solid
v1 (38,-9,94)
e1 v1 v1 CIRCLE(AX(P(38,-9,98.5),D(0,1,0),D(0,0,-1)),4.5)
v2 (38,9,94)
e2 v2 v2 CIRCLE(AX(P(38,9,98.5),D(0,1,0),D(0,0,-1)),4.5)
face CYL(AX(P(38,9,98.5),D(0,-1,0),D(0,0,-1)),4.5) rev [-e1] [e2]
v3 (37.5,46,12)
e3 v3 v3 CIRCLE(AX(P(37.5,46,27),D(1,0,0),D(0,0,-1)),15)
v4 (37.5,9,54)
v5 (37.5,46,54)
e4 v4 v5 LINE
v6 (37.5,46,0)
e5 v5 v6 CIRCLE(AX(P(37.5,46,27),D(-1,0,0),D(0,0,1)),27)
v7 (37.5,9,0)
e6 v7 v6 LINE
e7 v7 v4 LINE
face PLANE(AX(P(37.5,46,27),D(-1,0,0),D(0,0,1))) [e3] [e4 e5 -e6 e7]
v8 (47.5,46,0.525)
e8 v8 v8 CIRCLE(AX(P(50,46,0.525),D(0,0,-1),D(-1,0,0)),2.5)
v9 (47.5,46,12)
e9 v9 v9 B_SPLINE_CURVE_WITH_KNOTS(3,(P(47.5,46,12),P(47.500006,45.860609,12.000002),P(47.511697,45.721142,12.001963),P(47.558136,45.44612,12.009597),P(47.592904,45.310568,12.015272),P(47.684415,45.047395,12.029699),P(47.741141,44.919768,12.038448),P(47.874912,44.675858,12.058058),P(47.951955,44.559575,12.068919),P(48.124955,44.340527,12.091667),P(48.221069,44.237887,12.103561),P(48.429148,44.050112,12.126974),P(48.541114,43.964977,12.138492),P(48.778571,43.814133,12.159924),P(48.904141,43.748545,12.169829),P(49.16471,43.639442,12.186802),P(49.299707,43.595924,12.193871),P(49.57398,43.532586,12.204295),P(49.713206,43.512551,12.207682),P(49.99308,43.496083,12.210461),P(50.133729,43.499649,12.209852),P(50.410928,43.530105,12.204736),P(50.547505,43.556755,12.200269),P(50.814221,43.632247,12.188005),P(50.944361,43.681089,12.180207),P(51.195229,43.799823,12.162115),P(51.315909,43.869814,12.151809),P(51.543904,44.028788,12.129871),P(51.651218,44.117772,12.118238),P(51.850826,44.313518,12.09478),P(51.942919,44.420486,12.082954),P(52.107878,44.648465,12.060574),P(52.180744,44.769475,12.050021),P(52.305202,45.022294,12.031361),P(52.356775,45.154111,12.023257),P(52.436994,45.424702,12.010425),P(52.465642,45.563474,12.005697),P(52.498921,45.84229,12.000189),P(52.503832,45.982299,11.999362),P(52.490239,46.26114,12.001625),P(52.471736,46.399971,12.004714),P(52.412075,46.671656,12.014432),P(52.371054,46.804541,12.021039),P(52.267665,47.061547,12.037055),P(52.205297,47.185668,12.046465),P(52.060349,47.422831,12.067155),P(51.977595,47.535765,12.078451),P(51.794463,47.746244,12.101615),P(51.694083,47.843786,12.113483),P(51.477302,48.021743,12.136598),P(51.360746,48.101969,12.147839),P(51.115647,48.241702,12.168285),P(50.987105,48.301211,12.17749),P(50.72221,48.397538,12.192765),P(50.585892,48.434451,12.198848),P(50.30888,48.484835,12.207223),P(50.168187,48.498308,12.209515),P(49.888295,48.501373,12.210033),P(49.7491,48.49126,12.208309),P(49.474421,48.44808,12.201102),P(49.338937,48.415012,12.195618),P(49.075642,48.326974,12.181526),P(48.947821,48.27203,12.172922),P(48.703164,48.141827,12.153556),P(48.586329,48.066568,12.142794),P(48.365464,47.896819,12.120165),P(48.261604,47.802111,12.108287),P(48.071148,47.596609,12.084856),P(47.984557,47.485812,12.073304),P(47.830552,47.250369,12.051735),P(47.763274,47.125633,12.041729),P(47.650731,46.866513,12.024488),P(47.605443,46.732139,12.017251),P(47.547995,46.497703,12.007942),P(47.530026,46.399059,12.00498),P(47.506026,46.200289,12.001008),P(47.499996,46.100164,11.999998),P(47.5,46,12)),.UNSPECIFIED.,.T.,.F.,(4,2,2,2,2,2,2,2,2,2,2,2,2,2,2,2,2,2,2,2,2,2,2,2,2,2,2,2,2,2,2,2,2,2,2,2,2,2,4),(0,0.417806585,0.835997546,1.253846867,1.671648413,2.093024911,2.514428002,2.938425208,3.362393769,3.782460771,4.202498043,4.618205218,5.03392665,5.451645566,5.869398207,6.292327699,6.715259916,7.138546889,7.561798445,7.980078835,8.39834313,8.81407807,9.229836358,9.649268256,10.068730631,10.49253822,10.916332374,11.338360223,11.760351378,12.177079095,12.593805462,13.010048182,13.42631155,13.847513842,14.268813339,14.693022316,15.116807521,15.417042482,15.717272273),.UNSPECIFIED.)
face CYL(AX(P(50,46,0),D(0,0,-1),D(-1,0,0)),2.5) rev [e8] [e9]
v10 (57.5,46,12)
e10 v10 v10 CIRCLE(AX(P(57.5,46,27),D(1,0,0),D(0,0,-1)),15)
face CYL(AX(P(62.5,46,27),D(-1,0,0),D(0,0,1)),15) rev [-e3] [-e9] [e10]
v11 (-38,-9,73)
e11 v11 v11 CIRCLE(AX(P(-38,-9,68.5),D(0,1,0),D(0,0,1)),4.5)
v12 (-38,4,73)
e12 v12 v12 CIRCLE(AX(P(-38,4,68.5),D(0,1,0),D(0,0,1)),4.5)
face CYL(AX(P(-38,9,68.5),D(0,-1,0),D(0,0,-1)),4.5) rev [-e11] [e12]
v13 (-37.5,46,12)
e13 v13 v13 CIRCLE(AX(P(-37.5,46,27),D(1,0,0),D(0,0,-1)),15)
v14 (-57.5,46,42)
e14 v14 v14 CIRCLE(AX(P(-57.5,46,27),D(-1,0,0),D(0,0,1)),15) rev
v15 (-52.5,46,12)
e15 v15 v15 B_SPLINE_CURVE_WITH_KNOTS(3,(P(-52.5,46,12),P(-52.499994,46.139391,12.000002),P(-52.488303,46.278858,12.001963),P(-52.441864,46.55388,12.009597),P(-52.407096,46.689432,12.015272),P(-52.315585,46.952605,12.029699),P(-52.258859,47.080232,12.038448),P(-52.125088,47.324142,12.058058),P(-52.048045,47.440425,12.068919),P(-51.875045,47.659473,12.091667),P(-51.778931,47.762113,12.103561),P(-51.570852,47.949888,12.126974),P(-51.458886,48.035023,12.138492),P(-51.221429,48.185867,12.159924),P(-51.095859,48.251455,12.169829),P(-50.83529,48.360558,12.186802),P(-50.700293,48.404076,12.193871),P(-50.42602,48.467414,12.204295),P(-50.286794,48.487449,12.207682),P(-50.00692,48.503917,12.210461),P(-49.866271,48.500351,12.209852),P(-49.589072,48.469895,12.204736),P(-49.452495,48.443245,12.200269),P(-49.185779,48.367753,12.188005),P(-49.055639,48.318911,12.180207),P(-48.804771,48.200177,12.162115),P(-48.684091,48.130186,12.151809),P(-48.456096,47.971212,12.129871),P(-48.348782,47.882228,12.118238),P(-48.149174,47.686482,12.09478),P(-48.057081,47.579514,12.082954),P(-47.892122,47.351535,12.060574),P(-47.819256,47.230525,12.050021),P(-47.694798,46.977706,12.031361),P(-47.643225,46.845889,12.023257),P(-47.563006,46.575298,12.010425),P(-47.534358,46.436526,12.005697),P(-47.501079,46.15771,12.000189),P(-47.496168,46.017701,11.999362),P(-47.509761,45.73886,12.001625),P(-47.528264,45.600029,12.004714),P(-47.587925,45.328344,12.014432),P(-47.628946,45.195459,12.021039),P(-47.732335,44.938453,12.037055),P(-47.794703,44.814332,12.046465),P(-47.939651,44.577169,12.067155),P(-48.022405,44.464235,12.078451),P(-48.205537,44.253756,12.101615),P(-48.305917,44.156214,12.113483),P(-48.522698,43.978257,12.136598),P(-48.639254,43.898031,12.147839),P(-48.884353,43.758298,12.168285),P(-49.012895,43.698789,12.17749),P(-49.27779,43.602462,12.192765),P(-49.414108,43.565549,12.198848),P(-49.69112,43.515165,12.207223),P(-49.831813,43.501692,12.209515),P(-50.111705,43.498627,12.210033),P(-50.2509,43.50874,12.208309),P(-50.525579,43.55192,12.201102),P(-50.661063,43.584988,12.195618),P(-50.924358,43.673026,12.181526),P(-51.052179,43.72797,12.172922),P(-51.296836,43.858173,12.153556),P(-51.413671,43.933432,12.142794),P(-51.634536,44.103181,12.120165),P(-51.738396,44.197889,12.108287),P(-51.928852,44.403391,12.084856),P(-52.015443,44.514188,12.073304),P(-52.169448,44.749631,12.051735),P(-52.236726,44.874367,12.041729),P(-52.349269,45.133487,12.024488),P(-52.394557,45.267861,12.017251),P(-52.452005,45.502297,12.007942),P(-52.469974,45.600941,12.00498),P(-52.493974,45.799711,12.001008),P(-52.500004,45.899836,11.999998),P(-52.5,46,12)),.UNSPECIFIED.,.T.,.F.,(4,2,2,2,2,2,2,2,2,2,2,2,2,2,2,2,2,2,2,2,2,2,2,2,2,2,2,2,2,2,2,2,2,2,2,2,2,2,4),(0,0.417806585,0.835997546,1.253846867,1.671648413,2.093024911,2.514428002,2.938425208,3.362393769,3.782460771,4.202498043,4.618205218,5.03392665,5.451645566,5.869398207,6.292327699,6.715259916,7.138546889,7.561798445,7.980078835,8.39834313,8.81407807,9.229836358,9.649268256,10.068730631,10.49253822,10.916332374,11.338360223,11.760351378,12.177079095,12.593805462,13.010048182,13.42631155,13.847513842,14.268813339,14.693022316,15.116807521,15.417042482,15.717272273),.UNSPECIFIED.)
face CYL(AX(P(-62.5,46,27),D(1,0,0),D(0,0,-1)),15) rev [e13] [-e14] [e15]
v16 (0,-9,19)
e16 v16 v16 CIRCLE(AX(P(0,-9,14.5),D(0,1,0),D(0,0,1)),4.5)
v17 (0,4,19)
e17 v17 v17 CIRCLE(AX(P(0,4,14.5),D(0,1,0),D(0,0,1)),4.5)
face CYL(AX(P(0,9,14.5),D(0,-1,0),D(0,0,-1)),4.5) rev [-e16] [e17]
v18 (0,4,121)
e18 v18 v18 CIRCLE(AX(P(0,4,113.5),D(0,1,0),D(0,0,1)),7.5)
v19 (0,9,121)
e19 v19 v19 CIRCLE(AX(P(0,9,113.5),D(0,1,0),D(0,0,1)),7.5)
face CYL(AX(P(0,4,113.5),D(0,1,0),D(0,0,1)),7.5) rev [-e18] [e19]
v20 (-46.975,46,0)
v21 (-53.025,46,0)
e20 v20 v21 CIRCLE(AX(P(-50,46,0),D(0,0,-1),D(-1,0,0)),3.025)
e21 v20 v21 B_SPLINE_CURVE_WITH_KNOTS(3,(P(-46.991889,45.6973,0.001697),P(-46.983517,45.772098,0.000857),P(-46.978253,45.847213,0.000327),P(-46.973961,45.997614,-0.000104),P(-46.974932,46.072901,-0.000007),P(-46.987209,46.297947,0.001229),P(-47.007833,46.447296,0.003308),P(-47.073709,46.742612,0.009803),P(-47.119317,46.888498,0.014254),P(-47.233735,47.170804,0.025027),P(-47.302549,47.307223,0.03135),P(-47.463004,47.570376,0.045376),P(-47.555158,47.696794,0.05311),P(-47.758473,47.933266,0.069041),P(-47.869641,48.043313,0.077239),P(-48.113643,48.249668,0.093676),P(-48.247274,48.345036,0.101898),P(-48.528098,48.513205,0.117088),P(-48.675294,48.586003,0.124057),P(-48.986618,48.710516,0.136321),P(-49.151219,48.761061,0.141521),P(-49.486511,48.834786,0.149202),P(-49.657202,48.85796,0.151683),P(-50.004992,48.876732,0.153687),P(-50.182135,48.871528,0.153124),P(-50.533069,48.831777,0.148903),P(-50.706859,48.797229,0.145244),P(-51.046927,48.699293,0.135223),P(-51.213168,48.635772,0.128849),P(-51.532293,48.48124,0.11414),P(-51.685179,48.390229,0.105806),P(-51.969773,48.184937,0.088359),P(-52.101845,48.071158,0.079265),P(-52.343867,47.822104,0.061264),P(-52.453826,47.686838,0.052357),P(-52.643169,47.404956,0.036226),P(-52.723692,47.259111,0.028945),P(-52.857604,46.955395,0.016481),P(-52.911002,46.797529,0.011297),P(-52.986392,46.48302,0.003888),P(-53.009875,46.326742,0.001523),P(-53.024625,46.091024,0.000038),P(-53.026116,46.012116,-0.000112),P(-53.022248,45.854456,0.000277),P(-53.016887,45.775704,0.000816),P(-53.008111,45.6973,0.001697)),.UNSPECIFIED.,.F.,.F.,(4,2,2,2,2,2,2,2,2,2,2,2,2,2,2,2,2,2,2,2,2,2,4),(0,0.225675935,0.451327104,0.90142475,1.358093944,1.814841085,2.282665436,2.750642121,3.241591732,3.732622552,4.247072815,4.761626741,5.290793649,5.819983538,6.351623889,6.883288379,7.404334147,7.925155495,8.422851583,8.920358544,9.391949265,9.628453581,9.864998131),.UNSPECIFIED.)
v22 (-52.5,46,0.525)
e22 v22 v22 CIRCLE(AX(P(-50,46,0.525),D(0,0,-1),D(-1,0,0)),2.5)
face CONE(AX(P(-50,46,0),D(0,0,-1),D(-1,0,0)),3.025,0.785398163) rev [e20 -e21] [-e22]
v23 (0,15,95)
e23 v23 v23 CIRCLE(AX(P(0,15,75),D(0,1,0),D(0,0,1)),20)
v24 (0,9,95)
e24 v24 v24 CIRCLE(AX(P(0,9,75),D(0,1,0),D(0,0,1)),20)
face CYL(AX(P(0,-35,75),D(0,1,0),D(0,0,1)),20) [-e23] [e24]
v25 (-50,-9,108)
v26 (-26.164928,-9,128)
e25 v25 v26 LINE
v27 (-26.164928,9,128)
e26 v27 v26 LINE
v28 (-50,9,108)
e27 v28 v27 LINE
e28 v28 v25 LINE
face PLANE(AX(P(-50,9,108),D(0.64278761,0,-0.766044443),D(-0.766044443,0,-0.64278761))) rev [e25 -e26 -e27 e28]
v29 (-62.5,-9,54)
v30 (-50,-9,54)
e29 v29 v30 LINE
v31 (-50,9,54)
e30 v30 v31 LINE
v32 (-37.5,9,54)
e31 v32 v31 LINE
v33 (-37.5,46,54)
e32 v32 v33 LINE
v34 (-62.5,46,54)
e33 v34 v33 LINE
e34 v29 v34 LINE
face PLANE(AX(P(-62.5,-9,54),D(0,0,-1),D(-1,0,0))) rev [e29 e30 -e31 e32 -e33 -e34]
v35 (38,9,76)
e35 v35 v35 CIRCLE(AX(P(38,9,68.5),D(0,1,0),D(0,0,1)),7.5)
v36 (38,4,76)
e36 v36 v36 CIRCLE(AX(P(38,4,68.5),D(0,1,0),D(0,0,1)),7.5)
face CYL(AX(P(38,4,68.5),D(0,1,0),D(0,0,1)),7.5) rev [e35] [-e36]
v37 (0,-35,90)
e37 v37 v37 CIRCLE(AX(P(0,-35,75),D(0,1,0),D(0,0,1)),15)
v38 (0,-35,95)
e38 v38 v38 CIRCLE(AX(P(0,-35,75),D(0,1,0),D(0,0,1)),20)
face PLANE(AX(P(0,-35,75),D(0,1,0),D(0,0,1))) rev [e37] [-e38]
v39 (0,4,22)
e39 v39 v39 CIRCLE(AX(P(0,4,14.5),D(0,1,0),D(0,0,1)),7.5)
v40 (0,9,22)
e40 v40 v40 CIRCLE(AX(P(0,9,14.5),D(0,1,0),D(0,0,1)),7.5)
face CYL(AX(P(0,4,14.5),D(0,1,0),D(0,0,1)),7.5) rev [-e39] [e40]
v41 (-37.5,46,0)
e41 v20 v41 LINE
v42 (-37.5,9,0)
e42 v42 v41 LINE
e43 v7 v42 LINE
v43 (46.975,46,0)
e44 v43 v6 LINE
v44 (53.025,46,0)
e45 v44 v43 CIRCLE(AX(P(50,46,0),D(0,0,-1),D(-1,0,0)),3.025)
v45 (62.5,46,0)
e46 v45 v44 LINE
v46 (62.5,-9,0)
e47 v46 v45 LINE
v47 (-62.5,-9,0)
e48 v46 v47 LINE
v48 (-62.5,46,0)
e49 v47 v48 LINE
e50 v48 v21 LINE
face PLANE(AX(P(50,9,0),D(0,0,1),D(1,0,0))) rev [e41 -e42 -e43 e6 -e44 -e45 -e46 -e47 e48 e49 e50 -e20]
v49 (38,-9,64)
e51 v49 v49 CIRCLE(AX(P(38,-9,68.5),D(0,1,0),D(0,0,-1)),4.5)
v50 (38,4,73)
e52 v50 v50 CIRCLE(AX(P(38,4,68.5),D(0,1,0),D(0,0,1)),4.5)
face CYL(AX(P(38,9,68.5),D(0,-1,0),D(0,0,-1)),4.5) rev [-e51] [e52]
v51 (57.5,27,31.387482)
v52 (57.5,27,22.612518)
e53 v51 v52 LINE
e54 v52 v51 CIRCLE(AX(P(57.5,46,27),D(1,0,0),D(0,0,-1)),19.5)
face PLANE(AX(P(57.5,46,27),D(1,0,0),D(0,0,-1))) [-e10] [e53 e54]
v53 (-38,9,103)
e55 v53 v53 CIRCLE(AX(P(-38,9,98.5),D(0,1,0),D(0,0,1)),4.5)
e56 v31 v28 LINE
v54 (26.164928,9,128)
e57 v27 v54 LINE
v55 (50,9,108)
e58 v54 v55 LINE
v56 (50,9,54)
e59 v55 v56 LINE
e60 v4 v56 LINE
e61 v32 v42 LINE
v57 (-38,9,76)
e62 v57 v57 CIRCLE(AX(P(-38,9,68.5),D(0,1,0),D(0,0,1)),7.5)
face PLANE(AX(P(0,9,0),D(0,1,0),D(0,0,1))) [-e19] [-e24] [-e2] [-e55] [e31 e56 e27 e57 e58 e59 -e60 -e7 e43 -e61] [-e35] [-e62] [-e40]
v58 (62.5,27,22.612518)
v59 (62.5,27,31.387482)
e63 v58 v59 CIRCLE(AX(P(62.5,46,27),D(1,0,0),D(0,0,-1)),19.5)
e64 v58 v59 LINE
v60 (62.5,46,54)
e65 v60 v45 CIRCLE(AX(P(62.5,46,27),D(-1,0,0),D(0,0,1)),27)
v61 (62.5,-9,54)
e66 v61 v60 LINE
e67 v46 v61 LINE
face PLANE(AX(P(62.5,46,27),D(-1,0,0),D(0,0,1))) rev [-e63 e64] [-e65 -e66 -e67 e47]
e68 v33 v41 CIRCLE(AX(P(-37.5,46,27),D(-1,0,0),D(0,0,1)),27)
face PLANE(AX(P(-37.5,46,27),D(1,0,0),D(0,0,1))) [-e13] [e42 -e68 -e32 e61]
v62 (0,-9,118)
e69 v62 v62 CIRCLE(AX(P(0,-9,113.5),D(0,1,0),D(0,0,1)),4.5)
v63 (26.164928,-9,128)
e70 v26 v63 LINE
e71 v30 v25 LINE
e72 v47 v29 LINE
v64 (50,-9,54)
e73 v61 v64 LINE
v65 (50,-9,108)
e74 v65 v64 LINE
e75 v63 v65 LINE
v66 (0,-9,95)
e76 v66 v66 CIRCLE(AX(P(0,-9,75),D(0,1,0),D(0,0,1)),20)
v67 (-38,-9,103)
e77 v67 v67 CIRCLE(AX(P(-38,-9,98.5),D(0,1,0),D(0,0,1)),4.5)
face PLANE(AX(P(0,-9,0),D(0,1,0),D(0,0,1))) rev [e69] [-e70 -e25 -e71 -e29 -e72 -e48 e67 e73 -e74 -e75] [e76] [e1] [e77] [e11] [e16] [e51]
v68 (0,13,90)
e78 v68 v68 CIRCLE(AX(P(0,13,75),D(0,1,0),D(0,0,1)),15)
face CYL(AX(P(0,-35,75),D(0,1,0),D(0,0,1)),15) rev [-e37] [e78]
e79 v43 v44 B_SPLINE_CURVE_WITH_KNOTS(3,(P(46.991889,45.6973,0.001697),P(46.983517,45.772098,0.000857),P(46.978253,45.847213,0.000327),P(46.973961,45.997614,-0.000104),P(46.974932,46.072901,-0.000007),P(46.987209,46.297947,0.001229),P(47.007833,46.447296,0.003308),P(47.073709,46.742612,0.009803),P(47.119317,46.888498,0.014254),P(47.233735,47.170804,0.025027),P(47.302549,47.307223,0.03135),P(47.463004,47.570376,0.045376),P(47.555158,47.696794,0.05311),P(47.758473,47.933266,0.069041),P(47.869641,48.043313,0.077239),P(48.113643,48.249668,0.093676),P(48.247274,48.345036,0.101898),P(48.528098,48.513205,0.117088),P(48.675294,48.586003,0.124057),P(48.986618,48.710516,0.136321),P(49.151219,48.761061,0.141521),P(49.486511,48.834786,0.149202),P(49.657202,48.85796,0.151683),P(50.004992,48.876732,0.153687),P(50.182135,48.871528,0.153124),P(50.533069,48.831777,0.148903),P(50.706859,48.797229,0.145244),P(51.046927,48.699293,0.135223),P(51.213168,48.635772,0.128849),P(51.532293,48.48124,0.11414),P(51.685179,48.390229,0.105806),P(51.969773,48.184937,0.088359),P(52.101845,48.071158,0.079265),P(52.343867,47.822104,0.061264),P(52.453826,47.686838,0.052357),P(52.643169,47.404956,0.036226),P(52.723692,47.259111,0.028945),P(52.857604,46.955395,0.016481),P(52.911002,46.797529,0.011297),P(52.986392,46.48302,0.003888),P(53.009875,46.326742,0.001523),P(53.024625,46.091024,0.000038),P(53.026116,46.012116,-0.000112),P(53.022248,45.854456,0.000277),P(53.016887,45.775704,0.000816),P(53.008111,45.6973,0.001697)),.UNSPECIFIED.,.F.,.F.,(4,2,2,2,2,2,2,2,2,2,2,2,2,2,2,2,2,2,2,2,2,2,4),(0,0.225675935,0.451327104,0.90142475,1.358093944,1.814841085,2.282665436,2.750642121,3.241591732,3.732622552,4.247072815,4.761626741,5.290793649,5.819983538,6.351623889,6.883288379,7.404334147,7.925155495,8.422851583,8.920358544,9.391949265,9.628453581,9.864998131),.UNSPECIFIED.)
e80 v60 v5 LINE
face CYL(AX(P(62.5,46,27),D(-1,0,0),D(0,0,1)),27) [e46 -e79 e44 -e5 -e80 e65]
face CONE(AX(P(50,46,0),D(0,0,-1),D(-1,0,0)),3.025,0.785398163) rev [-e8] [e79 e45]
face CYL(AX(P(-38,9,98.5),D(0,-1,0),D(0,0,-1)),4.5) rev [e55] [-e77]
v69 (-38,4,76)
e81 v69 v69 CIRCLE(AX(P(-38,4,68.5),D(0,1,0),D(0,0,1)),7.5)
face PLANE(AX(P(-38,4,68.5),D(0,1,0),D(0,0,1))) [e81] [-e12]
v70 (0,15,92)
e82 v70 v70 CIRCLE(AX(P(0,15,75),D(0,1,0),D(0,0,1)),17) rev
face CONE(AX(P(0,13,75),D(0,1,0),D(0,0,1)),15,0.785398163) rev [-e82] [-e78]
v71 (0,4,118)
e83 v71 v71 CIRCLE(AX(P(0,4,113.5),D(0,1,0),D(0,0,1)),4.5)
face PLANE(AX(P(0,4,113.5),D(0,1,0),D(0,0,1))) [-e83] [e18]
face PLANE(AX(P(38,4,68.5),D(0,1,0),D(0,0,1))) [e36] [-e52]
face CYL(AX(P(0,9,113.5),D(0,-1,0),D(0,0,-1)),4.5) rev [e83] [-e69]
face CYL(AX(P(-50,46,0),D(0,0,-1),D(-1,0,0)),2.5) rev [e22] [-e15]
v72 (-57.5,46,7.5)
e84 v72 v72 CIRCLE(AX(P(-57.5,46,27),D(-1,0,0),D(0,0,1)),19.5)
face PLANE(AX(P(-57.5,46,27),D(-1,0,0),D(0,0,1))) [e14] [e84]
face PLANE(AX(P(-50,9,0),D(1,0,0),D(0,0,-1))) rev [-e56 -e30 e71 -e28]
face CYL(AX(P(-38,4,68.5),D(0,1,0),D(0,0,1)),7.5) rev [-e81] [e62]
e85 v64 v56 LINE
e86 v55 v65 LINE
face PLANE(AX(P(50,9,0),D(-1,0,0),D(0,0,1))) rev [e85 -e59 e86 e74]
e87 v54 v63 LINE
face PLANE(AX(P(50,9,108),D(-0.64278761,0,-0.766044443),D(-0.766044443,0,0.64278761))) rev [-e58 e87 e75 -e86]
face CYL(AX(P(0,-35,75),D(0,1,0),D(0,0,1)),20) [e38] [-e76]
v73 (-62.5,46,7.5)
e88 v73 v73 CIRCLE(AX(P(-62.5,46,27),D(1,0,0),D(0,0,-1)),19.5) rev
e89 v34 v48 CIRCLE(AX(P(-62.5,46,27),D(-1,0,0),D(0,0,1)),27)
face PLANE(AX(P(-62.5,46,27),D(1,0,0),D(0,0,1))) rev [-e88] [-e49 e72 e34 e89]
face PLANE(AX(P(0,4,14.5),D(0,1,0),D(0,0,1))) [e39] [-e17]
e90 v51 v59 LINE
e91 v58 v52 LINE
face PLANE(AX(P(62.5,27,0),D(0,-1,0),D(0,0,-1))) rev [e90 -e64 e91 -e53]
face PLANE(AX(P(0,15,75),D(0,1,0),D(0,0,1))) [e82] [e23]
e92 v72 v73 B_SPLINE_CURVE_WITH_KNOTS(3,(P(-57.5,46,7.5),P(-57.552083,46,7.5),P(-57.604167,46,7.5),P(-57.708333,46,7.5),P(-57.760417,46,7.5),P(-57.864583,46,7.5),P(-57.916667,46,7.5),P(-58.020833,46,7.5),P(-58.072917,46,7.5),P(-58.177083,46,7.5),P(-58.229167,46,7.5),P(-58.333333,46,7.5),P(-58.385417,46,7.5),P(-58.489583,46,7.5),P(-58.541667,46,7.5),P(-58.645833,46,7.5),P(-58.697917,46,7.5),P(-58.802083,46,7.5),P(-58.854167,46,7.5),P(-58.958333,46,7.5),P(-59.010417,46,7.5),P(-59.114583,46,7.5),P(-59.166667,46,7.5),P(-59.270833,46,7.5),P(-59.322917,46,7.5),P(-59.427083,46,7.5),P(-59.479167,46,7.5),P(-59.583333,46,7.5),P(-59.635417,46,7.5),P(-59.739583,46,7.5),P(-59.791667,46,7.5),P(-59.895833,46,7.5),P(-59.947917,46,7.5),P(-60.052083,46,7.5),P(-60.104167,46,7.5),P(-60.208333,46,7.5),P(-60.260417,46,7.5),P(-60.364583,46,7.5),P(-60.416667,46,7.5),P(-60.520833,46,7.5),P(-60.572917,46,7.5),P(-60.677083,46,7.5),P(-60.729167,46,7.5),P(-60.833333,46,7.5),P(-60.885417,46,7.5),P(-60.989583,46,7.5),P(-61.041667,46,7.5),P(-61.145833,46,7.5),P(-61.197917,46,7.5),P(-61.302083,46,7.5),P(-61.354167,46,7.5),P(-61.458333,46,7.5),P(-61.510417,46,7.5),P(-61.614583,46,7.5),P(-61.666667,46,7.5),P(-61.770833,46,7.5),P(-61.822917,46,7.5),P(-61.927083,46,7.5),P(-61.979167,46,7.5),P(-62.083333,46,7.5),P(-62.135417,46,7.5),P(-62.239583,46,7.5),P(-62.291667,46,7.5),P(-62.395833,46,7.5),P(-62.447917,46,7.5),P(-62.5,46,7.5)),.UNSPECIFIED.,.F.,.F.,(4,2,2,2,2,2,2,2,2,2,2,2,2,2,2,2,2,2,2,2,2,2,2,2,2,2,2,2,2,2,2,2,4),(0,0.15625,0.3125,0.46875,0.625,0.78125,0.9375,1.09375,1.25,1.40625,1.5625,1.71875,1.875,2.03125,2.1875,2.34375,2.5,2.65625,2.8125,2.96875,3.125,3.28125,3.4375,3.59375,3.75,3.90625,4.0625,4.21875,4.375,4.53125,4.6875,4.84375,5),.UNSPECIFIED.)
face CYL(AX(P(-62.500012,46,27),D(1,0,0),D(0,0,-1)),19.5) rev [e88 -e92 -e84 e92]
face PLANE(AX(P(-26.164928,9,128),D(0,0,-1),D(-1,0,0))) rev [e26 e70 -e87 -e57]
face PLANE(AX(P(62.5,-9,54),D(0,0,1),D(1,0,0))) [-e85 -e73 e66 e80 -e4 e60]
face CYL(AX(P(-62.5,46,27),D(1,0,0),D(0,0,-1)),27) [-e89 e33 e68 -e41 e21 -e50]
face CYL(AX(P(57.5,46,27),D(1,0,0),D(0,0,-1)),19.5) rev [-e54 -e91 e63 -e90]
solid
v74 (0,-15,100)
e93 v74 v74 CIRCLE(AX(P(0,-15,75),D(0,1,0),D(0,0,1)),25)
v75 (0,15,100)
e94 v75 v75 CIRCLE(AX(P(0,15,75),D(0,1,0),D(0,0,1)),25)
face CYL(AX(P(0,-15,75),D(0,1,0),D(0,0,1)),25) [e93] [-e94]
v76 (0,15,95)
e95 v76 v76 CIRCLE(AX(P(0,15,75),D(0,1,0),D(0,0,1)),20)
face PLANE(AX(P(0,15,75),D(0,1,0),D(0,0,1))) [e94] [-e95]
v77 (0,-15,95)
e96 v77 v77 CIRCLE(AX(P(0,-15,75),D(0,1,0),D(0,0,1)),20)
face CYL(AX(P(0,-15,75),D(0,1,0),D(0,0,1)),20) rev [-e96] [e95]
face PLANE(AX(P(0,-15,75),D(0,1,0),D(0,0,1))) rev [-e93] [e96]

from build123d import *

# Parameters (mm, degrees)
SKETCH_2_R               = 4.5
EXTRUDE_1_DEPTH          = 9
SKETCH_3_R               = 7.5
CUT_EXTRUDE_1_DEPTH      = 5
SKETCH_4_R               = 15
EXTRUDE_2_DEPTH          = 12.5
SKETCH_9_R               = 19.5
CUT_EXTRUDE_5_DEPTH      = 5
MIRROR_START             = -62.5
MIRROR_2_OUTLINE_R       = 15
MIRROR_2_DEPTH           = 25
MIRROR_START_2           = 37.5
MIRROR_2_2_OUTLINE_R     = 15
MIRROR_2_2_DEPTH         = 25
CUT_EXTRUDE_6_DEPTH      = 122.289941875
CUT_EXTRUDE_6_DEPTH_BACK = 122.289941875
SKETCH_12_W              = 125
SKETCH_12_H              = 52.775664422
CUT_EXTRUDE_7_DEPTH      = 194.230432386
CUT_EXTRUDE_7_DEPTH_BACK = 5
SKETCH_16_R              = 19.5
EXTRUDE_4_DEPTH          = 6
EXTRUDE_4_DEPTH_BACK     = 44
SKETCH_18_R              = 20
SKETCH_18_R_2            = 15
CHAMFER_1_SIZE           = 2
EXTRUDE_5_DEPTH          = 6
EXTRUDE_5_DEPTH_BACK     = 24
SKETCH_19_R              = 25
SKETCH_19_R_2            = 20
CUT_EXTRUDE_8_DEPTH      = 157.160974719
CUT_EXTRUDE_8_DEPTH_BACK = 157.160974719
SKETCH_20_R              = 15


# Read off the part's stored shape, not the designer's step: 镜向2, M6 螺纹孔3
with BuildPart() as part:
    # 草图2 → 凸台-拉伸1 (new, symmetric)
    with BuildSketch(Plane(origin=(0, 0, 0), x_dir=(1, 0, 0), z_dir=(0, 1, 0))):
        Polygon((50, 0), (-50, 0), (-50, -108), (-26.164928148, -128), (26.164928148, -128), (50, -108), align=None)
        with Locations(Location((0, -14.5, 0), (0, 0, 270))):
            Circle(SKETCH_2_R, mode=Mode.SUBTRACT)
        with Locations(Location((-38, -68.5, 0), (0, 0, 270))):
            Circle(SKETCH_2_R, mode=Mode.SUBTRACT)
        with Locations(Location((-38, -98.5, 0), (0, 0, 270))):
            Circle(SKETCH_2_R, mode=Mode.SUBTRACT)
        with Locations(Location((0, -113.5, 0), (0, 0, 270))):
            Circle(SKETCH_2_R, mode=Mode.SUBTRACT)
        with Locations(Location((38, -98.5, 0), (0, 0, 90))):
            Circle(SKETCH_2_R, mode=Mode.SUBTRACT)
        with Locations(Location((38, -68.5, 0), (0, 0, 90))):
            Circle(SKETCH_2_R, mode=Mode.SUBTRACT)
    extrude(amount=EXTRUDE_1_DEPTH, both=True)

    # 草图3 → 切除-拉伸1 (cut)
    with BuildSketch(Plane(origin=(0, 9, 0), x_dir=(1, 0, 0), z_dir=(0, 1, 0))):
        with Locations(Location((-38, -68.5, 0), (0, 0, 270))):
            Circle(SKETCH_3_R)
        with Locations(Location((0, -113.5, 0), (0, 0, 270))):
            Circle(SKETCH_3_R)
        with Locations(Location((38, -68.5, 0), (0, 0, 270))):
            Circle(SKETCH_3_R)
        with Locations(Location((0, -14.5, 0), (0, 0, 270))):
            Circle(SKETCH_3_R)
    extrude(amount=-CUT_EXTRUDE_1_DEPTH, mode=Mode.SUBTRACT)

    # 草图4 → 凸台-拉伸2 (add, symmetric)
    with BuildSketch(Plane(origin=(50, 0, 0), x_dir=(0, 0, -1), z_dir=(1, 0, 0))):
        with BuildLine():
            Line((0, -9), (-54, -9))
            Line((-54, -9), (-54, 46))
            ThreePointArc((-54, 46), (-27, 73), (0, 46))
            Line((0, 46), (0, -9))
        make_face()
        with Locations((-27, 46)):
            Circle(SKETCH_4_R, mode=Mode.SUBTRACT)
    extrude(amount=EXTRUDE_2_DEPTH, both=True)

    # 草图9 → 切除-拉伸5 (cut)
    with BuildSketch(Plane(origin=(62.5, 0, 0), x_dir=(0, 0, -1), z_dir=(1, 0, 0))):
        with Locations((-27, 46)):
            Circle(SKETCH_9_R)
    extrude(amount=-CUT_EXTRUDE_5_DEPTH, mode=Mode.SUBTRACT)

    # 镜向2 outline → 镜向2 (add)
    with BuildSketch(Plane.YZ.offset(MIRROR_START)):
        with BuildLine():
            ThreePointArc((46, 0), (73, 27), (46, 54))
            Line((46, 54), (-28, 54))
            ThreePointArc((-28, 54), (-55, 27), (-28, 0))
            Line((-28, 0), (46, 0))
        make_face()
        with Locations((46, 27)):
            Circle(MIRROR_2_OUTLINE_R, mode=Mode.SUBTRACT)
        with Locations((-28, 27)):
            Circle(MIRROR_2_OUTLINE_R, mode=Mode.SUBTRACT)
    extrude(amount=MIRROR_2_DEPTH)

    # Mirror 2 2 outline → Mirror 2 2 (add)
    # profile 1 of 2: a face of its own
    with BuildSketch(Plane.YZ.offset(MIRROR_START_2)):
        with BuildLine():
            Line((-28, 0), (-9, 0))
            Line((-9, 0), (-9, 54))
            Line((-9, 54), (-28, 54))
            ThreePointArc((-28, 54), (-55, 27), (-28, 0))
        make_face()
        with Locations((-28, 27)):
            Circle(MIRROR_2_2_OUTLINE_R, mode=Mode.SUBTRACT)
    # profile 2 of 2: a face of its own
    with BuildSketch(Plane.YZ.offset(MIRROR_START_2)):
        with BuildLine():
            Line((27, 22.612517806), (27, 31.387482194))
            ThreePointArc((27, 31.387482194), (26.5, 27), (27, 22.612517806))
        make_face()
    extrude(amount=MIRROR_2_2_DEPTH)

    # 草图12 → 切除-拉伸6 (cut, two sides: drawn at the far end of the back side and taken through both)
    with BuildSketch(Plane.XY.offset(54).offset(-CUT_EXTRUDE_6_DEPTH_BACK)):
        with Locations((0, -35.387832211)):
            Rectangle(SKETCH_12_W, SKETCH_12_H)
    extrude(amount=CUT_EXTRUDE_6_DEPTH + CUT_EXTRUDE_6_DEPTH_BACK, mode=Mode.SUBTRACT)

    # 草图16 → 切除-拉伸7 (cut, two sides: drawn at the far end of the back side and taken through both)
    with BuildSketch(Plane.ZY.offset(62.5).offset(-CUT_EXTRUDE_7_DEPTH_BACK)):
        with Locations(Location((27, 46, 0), (0, 0, 180))):
            Circle(SKETCH_16_R)
    extrude(amount=CUT_EXTRUDE_7_DEPTH + CUT_EXTRUDE_7_DEPTH_BACK, mode=Mode.SUBTRACT)

    # M6 螺纹孔3 outline → M6 螺纹孔3 (revolve, cut)
    with BuildSketch(Plane(origin=(-50, 46, 0), x_dir=(1, 0, 0), z_dir=(0, -1, 0))):
        Polygon((0, -1.887e-06), (3.025001887, -1.887e-06), (2.5, 0.525), (2.5, 12.209891195), (0, 12.209891195), align=None)
    revolve(axis=Axis((-50, 46, 0), (0, 0, 1)), mode=Mode.SUBTRACT)

    # Hole Wizard M6 _3 2 outline → Hole Wizard M6 _3 2 (revolve, cut)
    with BuildSketch(Plane(origin=(50, 46, 0), x_dir=(1, 0, 0), z_dir=(0, -1, 0))):
        Polygon((2.5, 0.525), (2.5, 12.209891195), (0, 12.209891195), (0, -1.887e-06), (3.025001887, -1.887e-06), align=None)
    revolve(axis=Axis((50, 46, 0), (0, 0, 1)), mode=Mode.SUBTRACT)

    # 草图18 → 凸台-拉伸4 (add, two sides: drawn at the far end of the back side and taken through both)
    with BuildSketch(Plane(origin=(0, 9, 0), x_dir=(1, 0, 0), z_dir=(0, 1, 0)).offset(-EXTRUDE_4_DEPTH_BACK)):
        with Locations(Location((0, -75, 0), (0, 0, 270))):
            Circle(SKETCH_18_R)
        with Locations(Location((0, -75, 0), (0, 0, 270))):
            Circle(SKETCH_18_R_2, mode=Mode.SUBTRACT)
    extrude(amount=EXTRUDE_4_DEPTH + EXTRUDE_4_DEPTH_BACK)

    # 倒角1
    chamfer_1_edges = [part.edges().sort_by_distance(p)[0] for p in [
        (0, 15, 60),
    ]]
    chamfer(chamfer_1_edges, length=CHAMFER_1_SIZE)

    # 草图20 → 切除-拉伸8 (cut, two sides: drawn at the far end of the back side and taken through both)
    with BuildSketch(Plane(origin=(0, 9, 0), x_dir=(1, 0, 0), z_dir=(0, 1, 0)).offset(-CUT_EXTRUDE_8_DEPTH_BACK)):
        with Locations(Location((0, -75, 0), (0, 0, 270))):
            Circle(SKETCH_20_R)
    extrude(amount=CUT_EXTRUDE_8_DEPTH + CUT_EXTRUDE_8_DEPTH_BACK, mode=Mode.SUBTRACT)


with BuildPart() as body_2:
    # 草图19 → 凸台-拉伸5 (new, two sides: drawn at the far end of the back side and taken through both)
    with BuildSketch(Plane(origin=(0, 9, 0), x_dir=(1, 0, 0), z_dir=(0, 1, 0)).offset(-EXTRUDE_5_DEPTH_BACK)):
        with Locations(Location((0, -75, 0), (0, 0, 270))):
            Circle(SKETCH_19_R)
        with Locations(Location((0, -75, 0), (0, 0, 270))):
            Circle(SKETCH_19_R_2, mode=Mode.SUBTRACT)
    extrude(amount=EXTRUDE_5_DEPTH + EXTRUDE_5_DEPTH_BACK)


solid = Compound([part.part, body_2.part])
